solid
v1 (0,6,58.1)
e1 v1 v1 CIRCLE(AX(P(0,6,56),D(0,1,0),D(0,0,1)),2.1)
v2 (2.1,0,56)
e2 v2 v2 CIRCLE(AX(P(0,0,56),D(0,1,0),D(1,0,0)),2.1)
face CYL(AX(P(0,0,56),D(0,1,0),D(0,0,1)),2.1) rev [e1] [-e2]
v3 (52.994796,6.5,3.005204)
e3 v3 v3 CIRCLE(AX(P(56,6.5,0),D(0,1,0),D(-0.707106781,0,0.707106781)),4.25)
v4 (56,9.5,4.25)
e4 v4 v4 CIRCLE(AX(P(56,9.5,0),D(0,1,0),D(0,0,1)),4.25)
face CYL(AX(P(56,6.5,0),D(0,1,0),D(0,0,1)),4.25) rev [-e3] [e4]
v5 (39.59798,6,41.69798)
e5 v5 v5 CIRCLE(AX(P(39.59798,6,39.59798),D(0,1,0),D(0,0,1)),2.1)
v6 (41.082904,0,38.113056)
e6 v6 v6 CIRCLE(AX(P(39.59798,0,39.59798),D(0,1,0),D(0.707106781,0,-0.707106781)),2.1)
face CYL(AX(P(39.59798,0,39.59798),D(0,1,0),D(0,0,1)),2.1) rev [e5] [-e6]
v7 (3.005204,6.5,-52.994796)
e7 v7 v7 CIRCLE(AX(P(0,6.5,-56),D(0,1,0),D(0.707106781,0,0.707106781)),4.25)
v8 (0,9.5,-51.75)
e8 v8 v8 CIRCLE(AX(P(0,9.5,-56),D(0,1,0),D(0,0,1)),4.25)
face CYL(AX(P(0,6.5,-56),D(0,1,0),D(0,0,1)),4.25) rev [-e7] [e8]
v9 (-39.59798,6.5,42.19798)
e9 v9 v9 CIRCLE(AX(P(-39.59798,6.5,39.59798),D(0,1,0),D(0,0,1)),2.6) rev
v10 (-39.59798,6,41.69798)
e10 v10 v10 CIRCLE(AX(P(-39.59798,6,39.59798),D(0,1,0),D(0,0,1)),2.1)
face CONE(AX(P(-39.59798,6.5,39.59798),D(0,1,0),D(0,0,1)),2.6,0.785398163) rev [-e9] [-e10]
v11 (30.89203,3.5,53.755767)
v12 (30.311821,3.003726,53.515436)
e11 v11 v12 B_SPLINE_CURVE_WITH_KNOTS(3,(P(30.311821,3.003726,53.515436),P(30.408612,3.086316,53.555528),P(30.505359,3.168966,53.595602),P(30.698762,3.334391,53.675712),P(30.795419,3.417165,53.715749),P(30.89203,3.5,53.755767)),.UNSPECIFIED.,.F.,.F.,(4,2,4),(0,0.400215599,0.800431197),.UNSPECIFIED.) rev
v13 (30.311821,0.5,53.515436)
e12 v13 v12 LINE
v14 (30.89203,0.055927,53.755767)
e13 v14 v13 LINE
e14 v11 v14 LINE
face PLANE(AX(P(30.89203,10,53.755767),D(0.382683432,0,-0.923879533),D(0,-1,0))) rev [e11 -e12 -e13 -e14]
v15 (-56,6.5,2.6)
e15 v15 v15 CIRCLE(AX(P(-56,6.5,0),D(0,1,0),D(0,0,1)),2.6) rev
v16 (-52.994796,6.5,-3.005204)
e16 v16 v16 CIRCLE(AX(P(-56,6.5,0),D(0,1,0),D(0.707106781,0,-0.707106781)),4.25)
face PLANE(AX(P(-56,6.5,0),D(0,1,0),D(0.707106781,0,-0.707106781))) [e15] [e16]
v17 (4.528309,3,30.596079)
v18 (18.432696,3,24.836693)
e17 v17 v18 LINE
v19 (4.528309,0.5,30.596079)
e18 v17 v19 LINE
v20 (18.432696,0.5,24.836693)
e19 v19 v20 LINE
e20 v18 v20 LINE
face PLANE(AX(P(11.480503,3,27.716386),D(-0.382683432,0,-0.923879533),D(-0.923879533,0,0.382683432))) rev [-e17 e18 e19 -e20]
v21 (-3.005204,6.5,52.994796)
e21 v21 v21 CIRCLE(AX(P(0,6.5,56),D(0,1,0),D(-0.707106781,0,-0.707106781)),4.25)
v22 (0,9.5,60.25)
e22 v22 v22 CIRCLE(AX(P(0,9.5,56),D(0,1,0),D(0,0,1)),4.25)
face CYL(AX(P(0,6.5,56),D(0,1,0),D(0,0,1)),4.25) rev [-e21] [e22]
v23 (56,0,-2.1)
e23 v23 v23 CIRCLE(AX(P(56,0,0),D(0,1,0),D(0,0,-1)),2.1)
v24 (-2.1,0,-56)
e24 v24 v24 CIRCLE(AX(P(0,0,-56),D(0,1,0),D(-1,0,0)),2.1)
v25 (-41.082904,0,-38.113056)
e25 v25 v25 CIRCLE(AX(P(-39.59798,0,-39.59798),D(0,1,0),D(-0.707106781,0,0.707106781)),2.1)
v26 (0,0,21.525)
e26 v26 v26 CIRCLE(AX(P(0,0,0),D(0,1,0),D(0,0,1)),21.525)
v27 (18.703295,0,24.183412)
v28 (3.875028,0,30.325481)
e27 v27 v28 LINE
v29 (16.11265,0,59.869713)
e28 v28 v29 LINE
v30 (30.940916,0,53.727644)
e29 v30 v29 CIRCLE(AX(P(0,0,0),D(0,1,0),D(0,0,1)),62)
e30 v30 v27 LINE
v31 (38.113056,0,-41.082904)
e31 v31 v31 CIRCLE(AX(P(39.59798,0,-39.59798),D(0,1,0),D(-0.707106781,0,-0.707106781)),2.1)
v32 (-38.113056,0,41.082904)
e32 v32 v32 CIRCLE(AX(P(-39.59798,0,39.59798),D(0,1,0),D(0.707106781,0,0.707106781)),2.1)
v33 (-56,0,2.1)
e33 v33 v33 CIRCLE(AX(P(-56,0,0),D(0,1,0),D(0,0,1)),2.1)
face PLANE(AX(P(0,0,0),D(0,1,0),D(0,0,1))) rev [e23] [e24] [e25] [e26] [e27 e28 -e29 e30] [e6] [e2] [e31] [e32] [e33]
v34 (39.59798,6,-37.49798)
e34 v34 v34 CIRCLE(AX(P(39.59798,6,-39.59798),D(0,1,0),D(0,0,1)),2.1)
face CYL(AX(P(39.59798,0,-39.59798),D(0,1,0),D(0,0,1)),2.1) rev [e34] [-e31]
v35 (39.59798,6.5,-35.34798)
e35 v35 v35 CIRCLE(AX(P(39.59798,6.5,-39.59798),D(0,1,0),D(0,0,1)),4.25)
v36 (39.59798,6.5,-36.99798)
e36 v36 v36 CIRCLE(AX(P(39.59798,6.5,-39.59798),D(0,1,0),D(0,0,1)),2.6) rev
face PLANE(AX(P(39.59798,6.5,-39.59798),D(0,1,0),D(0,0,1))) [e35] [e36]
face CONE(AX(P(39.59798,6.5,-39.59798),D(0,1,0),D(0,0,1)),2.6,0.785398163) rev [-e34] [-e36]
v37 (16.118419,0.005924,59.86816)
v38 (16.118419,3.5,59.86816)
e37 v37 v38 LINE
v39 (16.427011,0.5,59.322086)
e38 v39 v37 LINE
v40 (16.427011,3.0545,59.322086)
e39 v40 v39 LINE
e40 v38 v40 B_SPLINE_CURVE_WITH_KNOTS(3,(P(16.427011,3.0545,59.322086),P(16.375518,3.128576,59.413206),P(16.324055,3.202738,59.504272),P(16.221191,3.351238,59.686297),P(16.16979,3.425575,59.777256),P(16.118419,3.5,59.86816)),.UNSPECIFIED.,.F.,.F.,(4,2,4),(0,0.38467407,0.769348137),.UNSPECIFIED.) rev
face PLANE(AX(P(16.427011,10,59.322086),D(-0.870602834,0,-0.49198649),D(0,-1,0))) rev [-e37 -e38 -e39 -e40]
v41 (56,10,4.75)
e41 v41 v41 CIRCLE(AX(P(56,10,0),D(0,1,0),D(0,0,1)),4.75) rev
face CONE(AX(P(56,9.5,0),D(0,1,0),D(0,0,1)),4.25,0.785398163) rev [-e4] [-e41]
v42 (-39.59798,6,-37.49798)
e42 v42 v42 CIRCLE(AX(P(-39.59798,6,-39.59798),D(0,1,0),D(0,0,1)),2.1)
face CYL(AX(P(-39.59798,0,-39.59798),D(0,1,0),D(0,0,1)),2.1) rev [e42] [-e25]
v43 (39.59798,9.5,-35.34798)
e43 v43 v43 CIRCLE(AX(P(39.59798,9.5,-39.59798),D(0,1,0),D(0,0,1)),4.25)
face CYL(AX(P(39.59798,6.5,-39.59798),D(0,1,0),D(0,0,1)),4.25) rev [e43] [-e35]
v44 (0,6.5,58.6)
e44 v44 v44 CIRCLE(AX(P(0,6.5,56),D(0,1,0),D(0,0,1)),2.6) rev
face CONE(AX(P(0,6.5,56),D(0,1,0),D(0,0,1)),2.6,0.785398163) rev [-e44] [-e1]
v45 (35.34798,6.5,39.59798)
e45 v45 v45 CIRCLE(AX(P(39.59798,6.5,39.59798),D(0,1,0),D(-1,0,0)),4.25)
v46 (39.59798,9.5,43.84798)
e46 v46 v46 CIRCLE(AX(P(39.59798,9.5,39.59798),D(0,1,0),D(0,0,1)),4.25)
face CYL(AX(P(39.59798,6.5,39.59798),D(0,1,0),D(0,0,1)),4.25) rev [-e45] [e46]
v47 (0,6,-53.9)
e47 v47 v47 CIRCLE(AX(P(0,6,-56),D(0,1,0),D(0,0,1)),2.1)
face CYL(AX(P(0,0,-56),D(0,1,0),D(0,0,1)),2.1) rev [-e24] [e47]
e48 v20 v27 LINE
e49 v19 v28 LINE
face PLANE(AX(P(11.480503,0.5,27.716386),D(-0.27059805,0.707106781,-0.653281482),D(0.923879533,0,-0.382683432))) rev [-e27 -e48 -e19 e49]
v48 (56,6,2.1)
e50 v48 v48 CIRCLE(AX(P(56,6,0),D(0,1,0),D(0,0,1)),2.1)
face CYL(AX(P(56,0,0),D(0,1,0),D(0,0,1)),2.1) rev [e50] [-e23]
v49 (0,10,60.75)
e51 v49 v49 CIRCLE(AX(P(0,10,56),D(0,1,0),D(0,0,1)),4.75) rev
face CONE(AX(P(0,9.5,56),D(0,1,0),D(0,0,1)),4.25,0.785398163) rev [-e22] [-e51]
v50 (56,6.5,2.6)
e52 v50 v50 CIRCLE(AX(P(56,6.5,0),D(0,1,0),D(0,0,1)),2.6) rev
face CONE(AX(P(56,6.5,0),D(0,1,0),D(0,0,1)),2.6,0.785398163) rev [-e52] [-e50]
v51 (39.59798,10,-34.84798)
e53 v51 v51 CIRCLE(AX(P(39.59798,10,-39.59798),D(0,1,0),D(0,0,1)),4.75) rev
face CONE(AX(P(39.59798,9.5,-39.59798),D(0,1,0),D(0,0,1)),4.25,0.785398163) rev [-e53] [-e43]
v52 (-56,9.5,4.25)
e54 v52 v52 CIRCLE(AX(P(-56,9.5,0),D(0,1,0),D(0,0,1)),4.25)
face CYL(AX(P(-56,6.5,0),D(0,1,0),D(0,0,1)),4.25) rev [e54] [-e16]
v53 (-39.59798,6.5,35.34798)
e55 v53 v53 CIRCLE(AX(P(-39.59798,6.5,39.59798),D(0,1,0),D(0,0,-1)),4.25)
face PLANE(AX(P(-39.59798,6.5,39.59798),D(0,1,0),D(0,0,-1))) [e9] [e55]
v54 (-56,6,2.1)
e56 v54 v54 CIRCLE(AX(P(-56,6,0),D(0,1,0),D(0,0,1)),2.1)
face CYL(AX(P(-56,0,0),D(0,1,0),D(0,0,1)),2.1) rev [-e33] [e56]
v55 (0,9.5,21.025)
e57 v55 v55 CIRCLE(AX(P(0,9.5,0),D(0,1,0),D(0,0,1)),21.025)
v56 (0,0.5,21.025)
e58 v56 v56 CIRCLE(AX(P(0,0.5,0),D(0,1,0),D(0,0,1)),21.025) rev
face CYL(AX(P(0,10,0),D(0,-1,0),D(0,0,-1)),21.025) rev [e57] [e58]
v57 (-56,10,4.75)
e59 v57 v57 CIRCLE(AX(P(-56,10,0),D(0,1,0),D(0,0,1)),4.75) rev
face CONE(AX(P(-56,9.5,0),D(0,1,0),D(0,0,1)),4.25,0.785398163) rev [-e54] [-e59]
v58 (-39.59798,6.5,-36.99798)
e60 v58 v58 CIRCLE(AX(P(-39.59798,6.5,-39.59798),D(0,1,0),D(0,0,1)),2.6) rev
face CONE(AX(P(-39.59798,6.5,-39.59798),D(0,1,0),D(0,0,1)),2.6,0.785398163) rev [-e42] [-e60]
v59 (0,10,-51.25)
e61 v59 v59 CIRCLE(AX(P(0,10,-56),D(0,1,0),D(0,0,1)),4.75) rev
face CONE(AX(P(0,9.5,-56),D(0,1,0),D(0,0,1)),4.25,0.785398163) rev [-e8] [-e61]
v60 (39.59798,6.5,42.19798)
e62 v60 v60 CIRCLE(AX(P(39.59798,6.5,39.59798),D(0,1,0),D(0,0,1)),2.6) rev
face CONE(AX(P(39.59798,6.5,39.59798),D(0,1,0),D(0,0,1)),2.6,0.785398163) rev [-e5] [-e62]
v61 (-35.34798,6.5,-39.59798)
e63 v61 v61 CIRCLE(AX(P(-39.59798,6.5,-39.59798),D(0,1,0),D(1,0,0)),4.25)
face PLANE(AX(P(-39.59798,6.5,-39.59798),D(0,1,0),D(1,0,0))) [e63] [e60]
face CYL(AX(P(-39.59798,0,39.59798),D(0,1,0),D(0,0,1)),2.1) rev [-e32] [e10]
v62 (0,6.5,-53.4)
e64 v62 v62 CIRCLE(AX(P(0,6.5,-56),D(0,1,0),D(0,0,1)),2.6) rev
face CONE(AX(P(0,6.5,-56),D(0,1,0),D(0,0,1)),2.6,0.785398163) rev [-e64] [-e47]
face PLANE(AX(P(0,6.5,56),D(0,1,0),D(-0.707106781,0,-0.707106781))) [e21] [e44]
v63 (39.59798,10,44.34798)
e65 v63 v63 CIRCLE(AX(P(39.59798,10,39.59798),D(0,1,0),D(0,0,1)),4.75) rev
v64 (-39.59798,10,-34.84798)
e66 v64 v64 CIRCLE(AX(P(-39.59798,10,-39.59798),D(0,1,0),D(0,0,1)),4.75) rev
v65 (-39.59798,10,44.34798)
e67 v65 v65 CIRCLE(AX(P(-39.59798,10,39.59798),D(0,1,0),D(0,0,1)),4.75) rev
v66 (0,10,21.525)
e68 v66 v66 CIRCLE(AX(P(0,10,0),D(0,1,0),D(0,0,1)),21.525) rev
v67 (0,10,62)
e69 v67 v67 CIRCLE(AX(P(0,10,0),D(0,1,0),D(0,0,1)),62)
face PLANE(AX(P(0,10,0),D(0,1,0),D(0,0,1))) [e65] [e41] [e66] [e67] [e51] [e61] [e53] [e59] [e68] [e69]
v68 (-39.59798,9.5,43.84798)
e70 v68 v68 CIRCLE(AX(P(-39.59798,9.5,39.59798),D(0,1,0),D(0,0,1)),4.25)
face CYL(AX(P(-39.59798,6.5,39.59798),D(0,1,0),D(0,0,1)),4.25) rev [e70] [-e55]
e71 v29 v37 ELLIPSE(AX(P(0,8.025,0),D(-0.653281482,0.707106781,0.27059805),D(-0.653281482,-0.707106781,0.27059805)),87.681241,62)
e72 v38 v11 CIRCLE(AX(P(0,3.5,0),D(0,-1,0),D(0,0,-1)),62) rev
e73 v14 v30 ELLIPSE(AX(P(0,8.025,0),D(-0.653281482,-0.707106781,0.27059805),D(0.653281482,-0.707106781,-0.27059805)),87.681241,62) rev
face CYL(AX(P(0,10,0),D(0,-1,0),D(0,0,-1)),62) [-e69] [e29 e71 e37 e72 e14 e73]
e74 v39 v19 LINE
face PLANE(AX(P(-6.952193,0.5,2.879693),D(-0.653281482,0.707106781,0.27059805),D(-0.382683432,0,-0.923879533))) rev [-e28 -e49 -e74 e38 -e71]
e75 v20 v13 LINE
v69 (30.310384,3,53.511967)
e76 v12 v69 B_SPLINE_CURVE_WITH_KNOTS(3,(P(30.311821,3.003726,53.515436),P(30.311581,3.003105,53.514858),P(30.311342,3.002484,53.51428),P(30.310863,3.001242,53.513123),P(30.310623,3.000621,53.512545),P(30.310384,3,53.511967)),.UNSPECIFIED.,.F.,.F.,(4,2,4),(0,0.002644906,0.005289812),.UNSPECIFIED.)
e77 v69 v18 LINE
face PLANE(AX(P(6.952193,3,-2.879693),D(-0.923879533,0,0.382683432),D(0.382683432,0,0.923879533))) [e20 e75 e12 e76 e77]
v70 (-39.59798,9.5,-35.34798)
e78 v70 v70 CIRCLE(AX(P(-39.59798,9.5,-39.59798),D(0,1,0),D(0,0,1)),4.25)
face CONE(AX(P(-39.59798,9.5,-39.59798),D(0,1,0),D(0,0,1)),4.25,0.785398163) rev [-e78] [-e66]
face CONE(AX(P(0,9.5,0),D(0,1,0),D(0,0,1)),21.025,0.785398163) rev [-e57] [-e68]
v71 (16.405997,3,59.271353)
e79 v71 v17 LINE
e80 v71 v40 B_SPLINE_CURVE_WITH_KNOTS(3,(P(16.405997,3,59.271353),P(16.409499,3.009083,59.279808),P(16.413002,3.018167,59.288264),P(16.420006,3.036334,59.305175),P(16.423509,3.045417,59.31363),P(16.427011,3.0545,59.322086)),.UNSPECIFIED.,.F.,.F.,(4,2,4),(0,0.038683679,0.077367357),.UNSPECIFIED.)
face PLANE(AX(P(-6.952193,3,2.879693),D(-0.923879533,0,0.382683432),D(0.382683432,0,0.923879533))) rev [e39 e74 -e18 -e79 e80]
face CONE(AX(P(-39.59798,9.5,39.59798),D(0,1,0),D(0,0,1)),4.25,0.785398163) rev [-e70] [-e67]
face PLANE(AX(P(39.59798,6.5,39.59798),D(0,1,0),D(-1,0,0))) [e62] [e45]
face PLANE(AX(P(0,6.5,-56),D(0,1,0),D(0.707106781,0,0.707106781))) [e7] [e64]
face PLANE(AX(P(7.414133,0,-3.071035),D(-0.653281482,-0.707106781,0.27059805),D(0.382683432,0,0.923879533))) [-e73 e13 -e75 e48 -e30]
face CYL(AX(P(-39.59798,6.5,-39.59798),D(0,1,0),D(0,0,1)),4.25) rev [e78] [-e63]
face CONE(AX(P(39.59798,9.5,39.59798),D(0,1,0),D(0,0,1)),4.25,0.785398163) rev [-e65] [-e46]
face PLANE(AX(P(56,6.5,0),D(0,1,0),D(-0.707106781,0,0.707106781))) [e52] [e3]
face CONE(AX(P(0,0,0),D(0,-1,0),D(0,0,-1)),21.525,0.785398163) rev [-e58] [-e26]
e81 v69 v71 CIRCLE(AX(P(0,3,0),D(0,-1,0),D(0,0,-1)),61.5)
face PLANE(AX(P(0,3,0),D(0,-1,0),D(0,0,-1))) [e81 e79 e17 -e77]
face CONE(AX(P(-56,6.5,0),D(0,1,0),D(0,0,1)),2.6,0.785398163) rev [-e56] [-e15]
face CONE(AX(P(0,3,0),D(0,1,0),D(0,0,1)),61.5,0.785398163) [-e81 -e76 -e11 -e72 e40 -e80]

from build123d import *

# Parameters (mm, degrees)
SKETCH1_R           = 62
SKETCH1_R_2         = 21.025
BOSS_EXTRUDE1_DEPTH = 10
SKETCH3_R           = 2.1
CUT_EXTRUDE1_DEPTH  = 89.249645892
CIRPATTERN1_COUNT   = 8
SKETCH5_R           = 4.25
CUT_EXTRUDE3_DEPTH  = 3.5
CUT_EXTRUDE2_DEPTH  = 3
CHAMFER1_SIZE       = 0.5
CHAMFER2_SIZE       = 0.5
CHAMFER3_SIZE       = 0.5
CHAMFER4_SIZE       = 0.5
CHAMFER5_SIZE       = 0.5
CHAMFER5_SIZE_2     = 0.448841824


with BuildPart() as part:
    # Sketch1 → Boss-Extrude1 (new body)
    with BuildSketch(Plane(origin=(0, 0, 0), x_dir=(1, 0, 0), z_dir=(0, 1, 0))):
        with Locations(Location((0, 0, 0), (0, 0, 270))):
            Circle(SKETCH1_R)
        with Locations(Location((0, 0, 0), (0, 0, 270))):
            Circle(SKETCH1_R_2, mode=Mode.SUBTRACT)
    extrude(amount=BOSS_EXTRUDE1_DEPTH)

    # Sketch3 → Cut-Extrude1 (cut, through all)
    with BuildSketch(Plane(origin=(0, 10, 0), x_dir=(1, 0, 0), z_dir=(0, 1, 0))):
        with Locations(Location((-56, 0, 0), (0, 0, 270))):
            Circle(SKETCH3_R)
    cut_extrude1 = extrude(amount=-CUT_EXTRUDE1_DEPTH, mode=Mode.SUBTRACT)

    # CirPattern1: Cut-Extrude1 ×8 about axis
    cirpattern1_axis = Axis((0, 0, 0), (0, 1, 0))
    for i in range(1, CIRPATTERN1_COUNT):
        add(cut_extrude1.rotate(cirpattern1_axis, i * 360 / CIRPATTERN1_COUNT), mode=Mode.SUBTRACT)

    # Sketch5 → Cut-Extrude3 (cut)
    with BuildSketch(Plane(origin=(0, 10, 0), x_dir=(1, 0, 0), z_dir=(0, 1, 0))):
        with Locations(Location((39.597979746, 39.597979746, 0), (0, 0, 270))):
            Circle(SKETCH5_R)
    extrude(amount=-CUT_EXTRUDE3_DEPTH, mode=Mode.SUBTRACT)

    # Sketch4 → Cut-Extrude2 (cut)
    with BuildSketch(Plane.XZ):
        with BuildLine():
            ThreePointArc((30.503162375, 53.977375679), (27.165020613, 55.732052314), (23.72637336, 57.280530787))
            ThreePointArc((23.72637336, 57.280530787), (20.1999424, 58.617082212), (16.59877541, 59.736761336))
            Line((16.59877541, 59.736761336), (4.528309489, 30.596078804))
            Line((4.528309489, 30.596078804), (18.432696453, 24.836693147))
            Line((18.432696453, 24.836693147), (30.503162375, 53.977375679))
        make_face()
    extrude(amount=-CUT_EXTRUDE2_DEPTH, mode=Mode.SUBTRACT)

    # Chamfer1
    chamfer1_edges = [part.edges().sort_by_distance(p)[0] for p in [
        (39.597979746, 10, -43.847979746),
        (41.082903987, 6.5, -38.113055506),
    ]]
    chamfer(chamfer1_edges, length=CHAMFER1_SIZE)

    # CirPattern2: read off the stored shape, not the designer's step
    # CirPattern2 outline → CirPattern2 (revolve, cut)
    with BuildSketch(Plane.XY.offset(56)):
        Polygon((2.1, 10), (2.1, 6.5), (4.25, 6.5), (4.25, 9.5), (4.75, 10), align=None)
    revolve(axis=Axis((0, 0, 56), (0, 1, 0)), mode=Mode.SUBTRACT)

    # CirPattern2 2 outline → CirPattern2 2 (revolve, cut)
    with BuildSketch(Plane(origin=(39.597979746, 0, 39.597979746), x_dir=(1, 0, 0), z_dir=(0, 0, 1))):
        Polygon((2.1, 10), (2.1, 6.5), (4.25, 6.5), (4.25, 9.5), (4.75, 10), align=None)
    revolve(axis=Axis((39.597979746, 0, 39.597979746), (0, 1, 0)), mode=Mode.SUBTRACT)

    # CirPattern2 3 outline → CirPattern2 3 (revolve, cut)
    with BuildSketch(Plane(origin=(56, 0, 0), x_dir=(1, 0, 0), z_dir=(0, 0, 1))):
        Polygon((2.1, 10), (2.1, 6.5), (4.25, 6.5), (4.25, 9.5), (4.75, 10), align=None)
    revolve(axis=Axis((56, 0, 0), (0, 1, 0)), mode=Mode.SUBTRACT)

    # CirPattern2 4 outline → CirPattern2 4 (revolve, cut)
    with BuildSketch(Plane.XY.offset(-56)):
        Polygon((2.1, 10), (2.1, 6.5), (4.25, 6.5), (4.25, 9.5), (4.75, 10), align=None)
    revolve(axis=Axis((0, 0, -56), (0, 1, 0)), mode=Mode.SUBTRACT)

    # CirPattern2 5 outline → CirPattern2 5 (revolve, cut)
    with BuildSketch(Plane(origin=(-39.597979746, 0, -39.597979746), x_dir=(1, 0, 0), z_dir=(0, 0, 1))):
        Polygon((2.1, 10), (2.1, 6.5), (4.25, 6.5), (4.25, 9.5), (4.75, 10), align=None)
    revolve(axis=Axis((-39.597979746, 0, -39.597979746), (0, 1, 0)), mode=Mode.SUBTRACT)

    # CirPattern2 6 outline → CirPattern2 6 (revolve, cut)
    with BuildSketch(Plane(origin=(-39.597979746, 0, 39.597979746), x_dir=(1, 0, 0), z_dir=(0, 0, 1))):
        Polygon((2.1, 10), (2.1, 6.5), (4.25, 6.5), (4.25, 9.5), (4.75, 10), align=None)
    revolve(axis=Axis((-39.597979746, 0, 39.597979746), (0, 1, 0)), mode=Mode.SUBTRACT)

    # CirPattern2 7 outline → CirPattern2 7 (revolve, cut)
    with BuildSketch(Plane(origin=(-56, 0, 0), x_dir=(1, 0, 0), z_dir=(0, 0, 1))):
        Polygon((2.1, 10), (2.1, 6.5), (4.25, 6.5), (4.25, 9.5), (4.75, 10), align=None)
    revolve(axis=Axis((-56, 0, 0), (0, 1, 0)), mode=Mode.SUBTRACT)

    # Chamfer2
    chamfer2_edges = [part.edges().sort_by_distance(p)[0] for p in [
        (38.113055505, 6.5, 41.082903986),
        (56, 6.5, 2.1),
        (2.1, 6.5, -56),
        (-38.113055505, 6.5, -41.082903986),
        (-56, 6.5, -2.1),
        (-41.082903986, 6.5, 38.113055505),
        (-2.1, 6.5, 56),
    ]]
    chamfer(chamfer2_edges, length=CHAMFER2_SIZE)

    # Chamfer3
    chamfer3_edges = [part.edges().sort_by_distance(p)[0] for p in [
        (0, 0, -21.025),
        (0, 10, -21.025),
    ]]
    chamfer(chamfer3_edges, length=CHAMFER3_SIZE)

    # Chamfer4
    chamfer4_edges = [part.edges().sort_by_distance(p)[0] for p in [
        (24.467929414, 0, 39.407034413),
        (10.56354245, 0, 45.16642007),
        (11.480502971, 0, 27.716385975),
    ]]
    chamfer(chamfer4_edges, length=CHAMFER4_SIZE)

    # Chamfer5
    # the kernel refuses this chamfer: 0.5, 0.448841824 mm, written as the material it takes off along each edge
    with BuildSketch(Plane(origin=(30.503162375, -0.785841494, 53.977375679), x_dir=(0.868821324088061, 0, -0.49512574848200785), z_dir=(0, 1, 0))) as chamfer5_piece_1:
        with BuildLine():
            Line((0.447581222, 0), (CHAMFER5_SIZE * 0.124953018626, CHAMFER5_SIZE * 0.992162659616))
            Line((CHAMFER5_SIZE * 0.124953018626, CHAMFER5_SIZE * 0.992162659616), (0, 0))
            ThreePointArc((0, 0), (0.229921968, -0.000403587), (0.447581222, 0))
        make_face()
    extrude(amount=3.785841494, mode=Mode.SUBTRACT)
    with BuildSketch(Plane(origin=(0, 3, 0), x_dir=(0.5099353263138355, 0, 0.8602127428591152), z_dir=(0.8602127428591152, 0, -0.5099353263138355))) as chamfer5_piece_2_section:
        Polygon((62, -CHAMFER5_SIZE), (62 - CHAMFER5_SIZE, 0), (62, 0), align=None)
    chamfer5_piece_2 = revolve(axis=Axis((0, 3, 0), (0, -1, 0)), revolution_arc=16.319043914, mode=Mode.PRIVATE)
    chamfer5_piece_2 = split(chamfer5_piece_2, bisect_by=Plane(origin=(-6.952193482, 3, 2.879692829), z_dir=(0.9238795325112891, 0, -0.3826834323650844)), keep=Keep.TOP, mode=Mode.PRIVATE)
    chamfer5_piece_2 = split(chamfer5_piece_2, bisect_by=Plane(origin=(6.952193482, 3, -2.879692829), z_dir=(-0.923879532511289, 0, 0.38268343236508445)), keep=Keep.TOP, mode=Mode.PRIVATE)
    add(chamfer5_piece_2, mode=Mode.SUBTRACT)
    with BuildSketch(Plane(origin=(16.59877541, -0.780714965, 59.736761336), x_dir=(-0.9645635955346866, 0, 0.26385046933670087), z_dir=(0, 1, 0))) as chamfer5_piece_3:
        with BuildLine():
            Line((0.498003952, 0), (CHAMFER5_SIZE_2 * 0.125356459071, -CHAMFER5_SIZE_2 * 0.992111765865))
            Line((CHAMFER5_SIZE_2 * 0.125356459071, -CHAMFER5_SIZE_2 * 0.992111765865), (0, 0))
            ThreePointArc((0, 0), (0.256043839, 0.000499618), (0.498003952, 0))
        make_face()
    extrude(amount=3.780714965, mode=Mode.SUBTRACT)
    with BuildSketch(Plane(origin=(0, 3, 0), x_dir=(0.5099353263138355, 0, 0.8602127428591152), z_dir=(0.8602127428591152, 0, -0.5099353263138355))) as chamfer5_piece_4a_section:
        Polygon((62, -CHAMFER5_SIZE), (62 - CHAMFER5_SIZE, 0), (62, 0), align=None)
    chamfer5_piece_4a = revolve(axis=Axis((0, 3, 0), (0, -1, 0)), revolution_arc=16.319043914, mode=Mode.PRIVATE)
    chamfer5_piece_4a = split(chamfer5_piece_4a, bisect_by=Plane(origin=(6.952193482, 3, -2.879692829), z_dir=(0.923879532511289, 0, -0.38268343236508445)), keep=Keep.TOP, mode=Mode.PRIVATE)
    with BuildSketch(Plane(origin=(30.503162375, -0.785841494, 53.977375679), x_dir=(0.868821324088061, 0, -0.49512574848200785), z_dir=(0, 1, 0))) as chamfer5_piece_4b_section:
        with BuildLine():
            Line((0.447581222, 0), (CHAMFER5_SIZE * 0.124953018626, CHAMFER5_SIZE * 0.992162659616))
            Line((CHAMFER5_SIZE * 0.124953018626, CHAMFER5_SIZE * 0.992162659616), (0, 0))
            ThreePointArc((0, 0), (0.229921968, -0.000403587), (0.447581222, 0))
        make_face()
    chamfer5_piece_4b = extrude(amount=5.071682988, mode=Mode.PRIVATE)
    chamfer5_piece_4b = split(chamfer5_piece_4b, bisect_by=Plane(origin=(30.503162375, 3, 53.977375679), z_dir=(0, 1, 0)), keep=Keep.TOP, mode=Mode.PRIVATE)
    chamfer5_piece_4 = chamfer5_piece_4a & chamfer5_piece_4b
    add(chamfer5_piece_4, mode=Mode.SUBTRACT)
    with BuildSketch(Plane(origin=(16.59877541, -0.780714965, 59.736761336), x_dir=(-0.9645635955346866, 0, 0.26385046933670087), z_dir=(0, 1, 0))) as chamfer5_piece_5a_section:
        with BuildLine():
            Line((0.498003952, 0), (CHAMFER5_SIZE_2 * 0.125356459071, -CHAMFER5_SIZE_2 * 0.992111765865))
            Line((CHAMFER5_SIZE_2 * 0.125356459071, -CHAMFER5_SIZE_2 * 0.992111765865), (0, 0))
            ThreePointArc((0, 0), (0.256043839, 0.000499618), (0.498003952, 0))
        make_face()
    chamfer5_piece_5a = extrude(amount=5.06142993, mode=Mode.PRIVATE)
    chamfer5_piece_5a = split(chamfer5_piece_5a, bisect_by=Plane(origin=(16.59877541, 3, 59.736761336), z_dir=(0, 1, 0)), keep=Keep.TOP, mode=Mode.PRIVATE)
    with BuildSketch(Plane(origin=(0, 3, 0), x_dir=(0.5099353263138355, 0, 0.8602127428591152), z_dir=(0.8602127428591152, 0, -0.5099353263138355))) as chamfer5_piece_5b_section:
        Polygon((62, -CHAMFER5_SIZE), (62 - CHAMFER5_SIZE, 0), (62, 0), align=None)
    chamfer5_piece_5b = revolve(axis=Axis((0, 3, 0), (0, -1, 0)), revolution_arc=16.319043914, mode=Mode.PRIVATE)
    chamfer5_piece_5b = split(chamfer5_piece_5b, bisect_by=Plane(origin=(-6.952193482, 3, 2.879692829), z_dir=(-0.9238795325112891, 0, 0.3826834323650844)), keep=Keep.TOP, mode=Mode.PRIVATE)
    chamfer5_piece_5 = chamfer5_piece_5a & chamfer5_piece_5b
    add(chamfer5_piece_5, mode=Mode.SUBTRACT)


solid = part.part
